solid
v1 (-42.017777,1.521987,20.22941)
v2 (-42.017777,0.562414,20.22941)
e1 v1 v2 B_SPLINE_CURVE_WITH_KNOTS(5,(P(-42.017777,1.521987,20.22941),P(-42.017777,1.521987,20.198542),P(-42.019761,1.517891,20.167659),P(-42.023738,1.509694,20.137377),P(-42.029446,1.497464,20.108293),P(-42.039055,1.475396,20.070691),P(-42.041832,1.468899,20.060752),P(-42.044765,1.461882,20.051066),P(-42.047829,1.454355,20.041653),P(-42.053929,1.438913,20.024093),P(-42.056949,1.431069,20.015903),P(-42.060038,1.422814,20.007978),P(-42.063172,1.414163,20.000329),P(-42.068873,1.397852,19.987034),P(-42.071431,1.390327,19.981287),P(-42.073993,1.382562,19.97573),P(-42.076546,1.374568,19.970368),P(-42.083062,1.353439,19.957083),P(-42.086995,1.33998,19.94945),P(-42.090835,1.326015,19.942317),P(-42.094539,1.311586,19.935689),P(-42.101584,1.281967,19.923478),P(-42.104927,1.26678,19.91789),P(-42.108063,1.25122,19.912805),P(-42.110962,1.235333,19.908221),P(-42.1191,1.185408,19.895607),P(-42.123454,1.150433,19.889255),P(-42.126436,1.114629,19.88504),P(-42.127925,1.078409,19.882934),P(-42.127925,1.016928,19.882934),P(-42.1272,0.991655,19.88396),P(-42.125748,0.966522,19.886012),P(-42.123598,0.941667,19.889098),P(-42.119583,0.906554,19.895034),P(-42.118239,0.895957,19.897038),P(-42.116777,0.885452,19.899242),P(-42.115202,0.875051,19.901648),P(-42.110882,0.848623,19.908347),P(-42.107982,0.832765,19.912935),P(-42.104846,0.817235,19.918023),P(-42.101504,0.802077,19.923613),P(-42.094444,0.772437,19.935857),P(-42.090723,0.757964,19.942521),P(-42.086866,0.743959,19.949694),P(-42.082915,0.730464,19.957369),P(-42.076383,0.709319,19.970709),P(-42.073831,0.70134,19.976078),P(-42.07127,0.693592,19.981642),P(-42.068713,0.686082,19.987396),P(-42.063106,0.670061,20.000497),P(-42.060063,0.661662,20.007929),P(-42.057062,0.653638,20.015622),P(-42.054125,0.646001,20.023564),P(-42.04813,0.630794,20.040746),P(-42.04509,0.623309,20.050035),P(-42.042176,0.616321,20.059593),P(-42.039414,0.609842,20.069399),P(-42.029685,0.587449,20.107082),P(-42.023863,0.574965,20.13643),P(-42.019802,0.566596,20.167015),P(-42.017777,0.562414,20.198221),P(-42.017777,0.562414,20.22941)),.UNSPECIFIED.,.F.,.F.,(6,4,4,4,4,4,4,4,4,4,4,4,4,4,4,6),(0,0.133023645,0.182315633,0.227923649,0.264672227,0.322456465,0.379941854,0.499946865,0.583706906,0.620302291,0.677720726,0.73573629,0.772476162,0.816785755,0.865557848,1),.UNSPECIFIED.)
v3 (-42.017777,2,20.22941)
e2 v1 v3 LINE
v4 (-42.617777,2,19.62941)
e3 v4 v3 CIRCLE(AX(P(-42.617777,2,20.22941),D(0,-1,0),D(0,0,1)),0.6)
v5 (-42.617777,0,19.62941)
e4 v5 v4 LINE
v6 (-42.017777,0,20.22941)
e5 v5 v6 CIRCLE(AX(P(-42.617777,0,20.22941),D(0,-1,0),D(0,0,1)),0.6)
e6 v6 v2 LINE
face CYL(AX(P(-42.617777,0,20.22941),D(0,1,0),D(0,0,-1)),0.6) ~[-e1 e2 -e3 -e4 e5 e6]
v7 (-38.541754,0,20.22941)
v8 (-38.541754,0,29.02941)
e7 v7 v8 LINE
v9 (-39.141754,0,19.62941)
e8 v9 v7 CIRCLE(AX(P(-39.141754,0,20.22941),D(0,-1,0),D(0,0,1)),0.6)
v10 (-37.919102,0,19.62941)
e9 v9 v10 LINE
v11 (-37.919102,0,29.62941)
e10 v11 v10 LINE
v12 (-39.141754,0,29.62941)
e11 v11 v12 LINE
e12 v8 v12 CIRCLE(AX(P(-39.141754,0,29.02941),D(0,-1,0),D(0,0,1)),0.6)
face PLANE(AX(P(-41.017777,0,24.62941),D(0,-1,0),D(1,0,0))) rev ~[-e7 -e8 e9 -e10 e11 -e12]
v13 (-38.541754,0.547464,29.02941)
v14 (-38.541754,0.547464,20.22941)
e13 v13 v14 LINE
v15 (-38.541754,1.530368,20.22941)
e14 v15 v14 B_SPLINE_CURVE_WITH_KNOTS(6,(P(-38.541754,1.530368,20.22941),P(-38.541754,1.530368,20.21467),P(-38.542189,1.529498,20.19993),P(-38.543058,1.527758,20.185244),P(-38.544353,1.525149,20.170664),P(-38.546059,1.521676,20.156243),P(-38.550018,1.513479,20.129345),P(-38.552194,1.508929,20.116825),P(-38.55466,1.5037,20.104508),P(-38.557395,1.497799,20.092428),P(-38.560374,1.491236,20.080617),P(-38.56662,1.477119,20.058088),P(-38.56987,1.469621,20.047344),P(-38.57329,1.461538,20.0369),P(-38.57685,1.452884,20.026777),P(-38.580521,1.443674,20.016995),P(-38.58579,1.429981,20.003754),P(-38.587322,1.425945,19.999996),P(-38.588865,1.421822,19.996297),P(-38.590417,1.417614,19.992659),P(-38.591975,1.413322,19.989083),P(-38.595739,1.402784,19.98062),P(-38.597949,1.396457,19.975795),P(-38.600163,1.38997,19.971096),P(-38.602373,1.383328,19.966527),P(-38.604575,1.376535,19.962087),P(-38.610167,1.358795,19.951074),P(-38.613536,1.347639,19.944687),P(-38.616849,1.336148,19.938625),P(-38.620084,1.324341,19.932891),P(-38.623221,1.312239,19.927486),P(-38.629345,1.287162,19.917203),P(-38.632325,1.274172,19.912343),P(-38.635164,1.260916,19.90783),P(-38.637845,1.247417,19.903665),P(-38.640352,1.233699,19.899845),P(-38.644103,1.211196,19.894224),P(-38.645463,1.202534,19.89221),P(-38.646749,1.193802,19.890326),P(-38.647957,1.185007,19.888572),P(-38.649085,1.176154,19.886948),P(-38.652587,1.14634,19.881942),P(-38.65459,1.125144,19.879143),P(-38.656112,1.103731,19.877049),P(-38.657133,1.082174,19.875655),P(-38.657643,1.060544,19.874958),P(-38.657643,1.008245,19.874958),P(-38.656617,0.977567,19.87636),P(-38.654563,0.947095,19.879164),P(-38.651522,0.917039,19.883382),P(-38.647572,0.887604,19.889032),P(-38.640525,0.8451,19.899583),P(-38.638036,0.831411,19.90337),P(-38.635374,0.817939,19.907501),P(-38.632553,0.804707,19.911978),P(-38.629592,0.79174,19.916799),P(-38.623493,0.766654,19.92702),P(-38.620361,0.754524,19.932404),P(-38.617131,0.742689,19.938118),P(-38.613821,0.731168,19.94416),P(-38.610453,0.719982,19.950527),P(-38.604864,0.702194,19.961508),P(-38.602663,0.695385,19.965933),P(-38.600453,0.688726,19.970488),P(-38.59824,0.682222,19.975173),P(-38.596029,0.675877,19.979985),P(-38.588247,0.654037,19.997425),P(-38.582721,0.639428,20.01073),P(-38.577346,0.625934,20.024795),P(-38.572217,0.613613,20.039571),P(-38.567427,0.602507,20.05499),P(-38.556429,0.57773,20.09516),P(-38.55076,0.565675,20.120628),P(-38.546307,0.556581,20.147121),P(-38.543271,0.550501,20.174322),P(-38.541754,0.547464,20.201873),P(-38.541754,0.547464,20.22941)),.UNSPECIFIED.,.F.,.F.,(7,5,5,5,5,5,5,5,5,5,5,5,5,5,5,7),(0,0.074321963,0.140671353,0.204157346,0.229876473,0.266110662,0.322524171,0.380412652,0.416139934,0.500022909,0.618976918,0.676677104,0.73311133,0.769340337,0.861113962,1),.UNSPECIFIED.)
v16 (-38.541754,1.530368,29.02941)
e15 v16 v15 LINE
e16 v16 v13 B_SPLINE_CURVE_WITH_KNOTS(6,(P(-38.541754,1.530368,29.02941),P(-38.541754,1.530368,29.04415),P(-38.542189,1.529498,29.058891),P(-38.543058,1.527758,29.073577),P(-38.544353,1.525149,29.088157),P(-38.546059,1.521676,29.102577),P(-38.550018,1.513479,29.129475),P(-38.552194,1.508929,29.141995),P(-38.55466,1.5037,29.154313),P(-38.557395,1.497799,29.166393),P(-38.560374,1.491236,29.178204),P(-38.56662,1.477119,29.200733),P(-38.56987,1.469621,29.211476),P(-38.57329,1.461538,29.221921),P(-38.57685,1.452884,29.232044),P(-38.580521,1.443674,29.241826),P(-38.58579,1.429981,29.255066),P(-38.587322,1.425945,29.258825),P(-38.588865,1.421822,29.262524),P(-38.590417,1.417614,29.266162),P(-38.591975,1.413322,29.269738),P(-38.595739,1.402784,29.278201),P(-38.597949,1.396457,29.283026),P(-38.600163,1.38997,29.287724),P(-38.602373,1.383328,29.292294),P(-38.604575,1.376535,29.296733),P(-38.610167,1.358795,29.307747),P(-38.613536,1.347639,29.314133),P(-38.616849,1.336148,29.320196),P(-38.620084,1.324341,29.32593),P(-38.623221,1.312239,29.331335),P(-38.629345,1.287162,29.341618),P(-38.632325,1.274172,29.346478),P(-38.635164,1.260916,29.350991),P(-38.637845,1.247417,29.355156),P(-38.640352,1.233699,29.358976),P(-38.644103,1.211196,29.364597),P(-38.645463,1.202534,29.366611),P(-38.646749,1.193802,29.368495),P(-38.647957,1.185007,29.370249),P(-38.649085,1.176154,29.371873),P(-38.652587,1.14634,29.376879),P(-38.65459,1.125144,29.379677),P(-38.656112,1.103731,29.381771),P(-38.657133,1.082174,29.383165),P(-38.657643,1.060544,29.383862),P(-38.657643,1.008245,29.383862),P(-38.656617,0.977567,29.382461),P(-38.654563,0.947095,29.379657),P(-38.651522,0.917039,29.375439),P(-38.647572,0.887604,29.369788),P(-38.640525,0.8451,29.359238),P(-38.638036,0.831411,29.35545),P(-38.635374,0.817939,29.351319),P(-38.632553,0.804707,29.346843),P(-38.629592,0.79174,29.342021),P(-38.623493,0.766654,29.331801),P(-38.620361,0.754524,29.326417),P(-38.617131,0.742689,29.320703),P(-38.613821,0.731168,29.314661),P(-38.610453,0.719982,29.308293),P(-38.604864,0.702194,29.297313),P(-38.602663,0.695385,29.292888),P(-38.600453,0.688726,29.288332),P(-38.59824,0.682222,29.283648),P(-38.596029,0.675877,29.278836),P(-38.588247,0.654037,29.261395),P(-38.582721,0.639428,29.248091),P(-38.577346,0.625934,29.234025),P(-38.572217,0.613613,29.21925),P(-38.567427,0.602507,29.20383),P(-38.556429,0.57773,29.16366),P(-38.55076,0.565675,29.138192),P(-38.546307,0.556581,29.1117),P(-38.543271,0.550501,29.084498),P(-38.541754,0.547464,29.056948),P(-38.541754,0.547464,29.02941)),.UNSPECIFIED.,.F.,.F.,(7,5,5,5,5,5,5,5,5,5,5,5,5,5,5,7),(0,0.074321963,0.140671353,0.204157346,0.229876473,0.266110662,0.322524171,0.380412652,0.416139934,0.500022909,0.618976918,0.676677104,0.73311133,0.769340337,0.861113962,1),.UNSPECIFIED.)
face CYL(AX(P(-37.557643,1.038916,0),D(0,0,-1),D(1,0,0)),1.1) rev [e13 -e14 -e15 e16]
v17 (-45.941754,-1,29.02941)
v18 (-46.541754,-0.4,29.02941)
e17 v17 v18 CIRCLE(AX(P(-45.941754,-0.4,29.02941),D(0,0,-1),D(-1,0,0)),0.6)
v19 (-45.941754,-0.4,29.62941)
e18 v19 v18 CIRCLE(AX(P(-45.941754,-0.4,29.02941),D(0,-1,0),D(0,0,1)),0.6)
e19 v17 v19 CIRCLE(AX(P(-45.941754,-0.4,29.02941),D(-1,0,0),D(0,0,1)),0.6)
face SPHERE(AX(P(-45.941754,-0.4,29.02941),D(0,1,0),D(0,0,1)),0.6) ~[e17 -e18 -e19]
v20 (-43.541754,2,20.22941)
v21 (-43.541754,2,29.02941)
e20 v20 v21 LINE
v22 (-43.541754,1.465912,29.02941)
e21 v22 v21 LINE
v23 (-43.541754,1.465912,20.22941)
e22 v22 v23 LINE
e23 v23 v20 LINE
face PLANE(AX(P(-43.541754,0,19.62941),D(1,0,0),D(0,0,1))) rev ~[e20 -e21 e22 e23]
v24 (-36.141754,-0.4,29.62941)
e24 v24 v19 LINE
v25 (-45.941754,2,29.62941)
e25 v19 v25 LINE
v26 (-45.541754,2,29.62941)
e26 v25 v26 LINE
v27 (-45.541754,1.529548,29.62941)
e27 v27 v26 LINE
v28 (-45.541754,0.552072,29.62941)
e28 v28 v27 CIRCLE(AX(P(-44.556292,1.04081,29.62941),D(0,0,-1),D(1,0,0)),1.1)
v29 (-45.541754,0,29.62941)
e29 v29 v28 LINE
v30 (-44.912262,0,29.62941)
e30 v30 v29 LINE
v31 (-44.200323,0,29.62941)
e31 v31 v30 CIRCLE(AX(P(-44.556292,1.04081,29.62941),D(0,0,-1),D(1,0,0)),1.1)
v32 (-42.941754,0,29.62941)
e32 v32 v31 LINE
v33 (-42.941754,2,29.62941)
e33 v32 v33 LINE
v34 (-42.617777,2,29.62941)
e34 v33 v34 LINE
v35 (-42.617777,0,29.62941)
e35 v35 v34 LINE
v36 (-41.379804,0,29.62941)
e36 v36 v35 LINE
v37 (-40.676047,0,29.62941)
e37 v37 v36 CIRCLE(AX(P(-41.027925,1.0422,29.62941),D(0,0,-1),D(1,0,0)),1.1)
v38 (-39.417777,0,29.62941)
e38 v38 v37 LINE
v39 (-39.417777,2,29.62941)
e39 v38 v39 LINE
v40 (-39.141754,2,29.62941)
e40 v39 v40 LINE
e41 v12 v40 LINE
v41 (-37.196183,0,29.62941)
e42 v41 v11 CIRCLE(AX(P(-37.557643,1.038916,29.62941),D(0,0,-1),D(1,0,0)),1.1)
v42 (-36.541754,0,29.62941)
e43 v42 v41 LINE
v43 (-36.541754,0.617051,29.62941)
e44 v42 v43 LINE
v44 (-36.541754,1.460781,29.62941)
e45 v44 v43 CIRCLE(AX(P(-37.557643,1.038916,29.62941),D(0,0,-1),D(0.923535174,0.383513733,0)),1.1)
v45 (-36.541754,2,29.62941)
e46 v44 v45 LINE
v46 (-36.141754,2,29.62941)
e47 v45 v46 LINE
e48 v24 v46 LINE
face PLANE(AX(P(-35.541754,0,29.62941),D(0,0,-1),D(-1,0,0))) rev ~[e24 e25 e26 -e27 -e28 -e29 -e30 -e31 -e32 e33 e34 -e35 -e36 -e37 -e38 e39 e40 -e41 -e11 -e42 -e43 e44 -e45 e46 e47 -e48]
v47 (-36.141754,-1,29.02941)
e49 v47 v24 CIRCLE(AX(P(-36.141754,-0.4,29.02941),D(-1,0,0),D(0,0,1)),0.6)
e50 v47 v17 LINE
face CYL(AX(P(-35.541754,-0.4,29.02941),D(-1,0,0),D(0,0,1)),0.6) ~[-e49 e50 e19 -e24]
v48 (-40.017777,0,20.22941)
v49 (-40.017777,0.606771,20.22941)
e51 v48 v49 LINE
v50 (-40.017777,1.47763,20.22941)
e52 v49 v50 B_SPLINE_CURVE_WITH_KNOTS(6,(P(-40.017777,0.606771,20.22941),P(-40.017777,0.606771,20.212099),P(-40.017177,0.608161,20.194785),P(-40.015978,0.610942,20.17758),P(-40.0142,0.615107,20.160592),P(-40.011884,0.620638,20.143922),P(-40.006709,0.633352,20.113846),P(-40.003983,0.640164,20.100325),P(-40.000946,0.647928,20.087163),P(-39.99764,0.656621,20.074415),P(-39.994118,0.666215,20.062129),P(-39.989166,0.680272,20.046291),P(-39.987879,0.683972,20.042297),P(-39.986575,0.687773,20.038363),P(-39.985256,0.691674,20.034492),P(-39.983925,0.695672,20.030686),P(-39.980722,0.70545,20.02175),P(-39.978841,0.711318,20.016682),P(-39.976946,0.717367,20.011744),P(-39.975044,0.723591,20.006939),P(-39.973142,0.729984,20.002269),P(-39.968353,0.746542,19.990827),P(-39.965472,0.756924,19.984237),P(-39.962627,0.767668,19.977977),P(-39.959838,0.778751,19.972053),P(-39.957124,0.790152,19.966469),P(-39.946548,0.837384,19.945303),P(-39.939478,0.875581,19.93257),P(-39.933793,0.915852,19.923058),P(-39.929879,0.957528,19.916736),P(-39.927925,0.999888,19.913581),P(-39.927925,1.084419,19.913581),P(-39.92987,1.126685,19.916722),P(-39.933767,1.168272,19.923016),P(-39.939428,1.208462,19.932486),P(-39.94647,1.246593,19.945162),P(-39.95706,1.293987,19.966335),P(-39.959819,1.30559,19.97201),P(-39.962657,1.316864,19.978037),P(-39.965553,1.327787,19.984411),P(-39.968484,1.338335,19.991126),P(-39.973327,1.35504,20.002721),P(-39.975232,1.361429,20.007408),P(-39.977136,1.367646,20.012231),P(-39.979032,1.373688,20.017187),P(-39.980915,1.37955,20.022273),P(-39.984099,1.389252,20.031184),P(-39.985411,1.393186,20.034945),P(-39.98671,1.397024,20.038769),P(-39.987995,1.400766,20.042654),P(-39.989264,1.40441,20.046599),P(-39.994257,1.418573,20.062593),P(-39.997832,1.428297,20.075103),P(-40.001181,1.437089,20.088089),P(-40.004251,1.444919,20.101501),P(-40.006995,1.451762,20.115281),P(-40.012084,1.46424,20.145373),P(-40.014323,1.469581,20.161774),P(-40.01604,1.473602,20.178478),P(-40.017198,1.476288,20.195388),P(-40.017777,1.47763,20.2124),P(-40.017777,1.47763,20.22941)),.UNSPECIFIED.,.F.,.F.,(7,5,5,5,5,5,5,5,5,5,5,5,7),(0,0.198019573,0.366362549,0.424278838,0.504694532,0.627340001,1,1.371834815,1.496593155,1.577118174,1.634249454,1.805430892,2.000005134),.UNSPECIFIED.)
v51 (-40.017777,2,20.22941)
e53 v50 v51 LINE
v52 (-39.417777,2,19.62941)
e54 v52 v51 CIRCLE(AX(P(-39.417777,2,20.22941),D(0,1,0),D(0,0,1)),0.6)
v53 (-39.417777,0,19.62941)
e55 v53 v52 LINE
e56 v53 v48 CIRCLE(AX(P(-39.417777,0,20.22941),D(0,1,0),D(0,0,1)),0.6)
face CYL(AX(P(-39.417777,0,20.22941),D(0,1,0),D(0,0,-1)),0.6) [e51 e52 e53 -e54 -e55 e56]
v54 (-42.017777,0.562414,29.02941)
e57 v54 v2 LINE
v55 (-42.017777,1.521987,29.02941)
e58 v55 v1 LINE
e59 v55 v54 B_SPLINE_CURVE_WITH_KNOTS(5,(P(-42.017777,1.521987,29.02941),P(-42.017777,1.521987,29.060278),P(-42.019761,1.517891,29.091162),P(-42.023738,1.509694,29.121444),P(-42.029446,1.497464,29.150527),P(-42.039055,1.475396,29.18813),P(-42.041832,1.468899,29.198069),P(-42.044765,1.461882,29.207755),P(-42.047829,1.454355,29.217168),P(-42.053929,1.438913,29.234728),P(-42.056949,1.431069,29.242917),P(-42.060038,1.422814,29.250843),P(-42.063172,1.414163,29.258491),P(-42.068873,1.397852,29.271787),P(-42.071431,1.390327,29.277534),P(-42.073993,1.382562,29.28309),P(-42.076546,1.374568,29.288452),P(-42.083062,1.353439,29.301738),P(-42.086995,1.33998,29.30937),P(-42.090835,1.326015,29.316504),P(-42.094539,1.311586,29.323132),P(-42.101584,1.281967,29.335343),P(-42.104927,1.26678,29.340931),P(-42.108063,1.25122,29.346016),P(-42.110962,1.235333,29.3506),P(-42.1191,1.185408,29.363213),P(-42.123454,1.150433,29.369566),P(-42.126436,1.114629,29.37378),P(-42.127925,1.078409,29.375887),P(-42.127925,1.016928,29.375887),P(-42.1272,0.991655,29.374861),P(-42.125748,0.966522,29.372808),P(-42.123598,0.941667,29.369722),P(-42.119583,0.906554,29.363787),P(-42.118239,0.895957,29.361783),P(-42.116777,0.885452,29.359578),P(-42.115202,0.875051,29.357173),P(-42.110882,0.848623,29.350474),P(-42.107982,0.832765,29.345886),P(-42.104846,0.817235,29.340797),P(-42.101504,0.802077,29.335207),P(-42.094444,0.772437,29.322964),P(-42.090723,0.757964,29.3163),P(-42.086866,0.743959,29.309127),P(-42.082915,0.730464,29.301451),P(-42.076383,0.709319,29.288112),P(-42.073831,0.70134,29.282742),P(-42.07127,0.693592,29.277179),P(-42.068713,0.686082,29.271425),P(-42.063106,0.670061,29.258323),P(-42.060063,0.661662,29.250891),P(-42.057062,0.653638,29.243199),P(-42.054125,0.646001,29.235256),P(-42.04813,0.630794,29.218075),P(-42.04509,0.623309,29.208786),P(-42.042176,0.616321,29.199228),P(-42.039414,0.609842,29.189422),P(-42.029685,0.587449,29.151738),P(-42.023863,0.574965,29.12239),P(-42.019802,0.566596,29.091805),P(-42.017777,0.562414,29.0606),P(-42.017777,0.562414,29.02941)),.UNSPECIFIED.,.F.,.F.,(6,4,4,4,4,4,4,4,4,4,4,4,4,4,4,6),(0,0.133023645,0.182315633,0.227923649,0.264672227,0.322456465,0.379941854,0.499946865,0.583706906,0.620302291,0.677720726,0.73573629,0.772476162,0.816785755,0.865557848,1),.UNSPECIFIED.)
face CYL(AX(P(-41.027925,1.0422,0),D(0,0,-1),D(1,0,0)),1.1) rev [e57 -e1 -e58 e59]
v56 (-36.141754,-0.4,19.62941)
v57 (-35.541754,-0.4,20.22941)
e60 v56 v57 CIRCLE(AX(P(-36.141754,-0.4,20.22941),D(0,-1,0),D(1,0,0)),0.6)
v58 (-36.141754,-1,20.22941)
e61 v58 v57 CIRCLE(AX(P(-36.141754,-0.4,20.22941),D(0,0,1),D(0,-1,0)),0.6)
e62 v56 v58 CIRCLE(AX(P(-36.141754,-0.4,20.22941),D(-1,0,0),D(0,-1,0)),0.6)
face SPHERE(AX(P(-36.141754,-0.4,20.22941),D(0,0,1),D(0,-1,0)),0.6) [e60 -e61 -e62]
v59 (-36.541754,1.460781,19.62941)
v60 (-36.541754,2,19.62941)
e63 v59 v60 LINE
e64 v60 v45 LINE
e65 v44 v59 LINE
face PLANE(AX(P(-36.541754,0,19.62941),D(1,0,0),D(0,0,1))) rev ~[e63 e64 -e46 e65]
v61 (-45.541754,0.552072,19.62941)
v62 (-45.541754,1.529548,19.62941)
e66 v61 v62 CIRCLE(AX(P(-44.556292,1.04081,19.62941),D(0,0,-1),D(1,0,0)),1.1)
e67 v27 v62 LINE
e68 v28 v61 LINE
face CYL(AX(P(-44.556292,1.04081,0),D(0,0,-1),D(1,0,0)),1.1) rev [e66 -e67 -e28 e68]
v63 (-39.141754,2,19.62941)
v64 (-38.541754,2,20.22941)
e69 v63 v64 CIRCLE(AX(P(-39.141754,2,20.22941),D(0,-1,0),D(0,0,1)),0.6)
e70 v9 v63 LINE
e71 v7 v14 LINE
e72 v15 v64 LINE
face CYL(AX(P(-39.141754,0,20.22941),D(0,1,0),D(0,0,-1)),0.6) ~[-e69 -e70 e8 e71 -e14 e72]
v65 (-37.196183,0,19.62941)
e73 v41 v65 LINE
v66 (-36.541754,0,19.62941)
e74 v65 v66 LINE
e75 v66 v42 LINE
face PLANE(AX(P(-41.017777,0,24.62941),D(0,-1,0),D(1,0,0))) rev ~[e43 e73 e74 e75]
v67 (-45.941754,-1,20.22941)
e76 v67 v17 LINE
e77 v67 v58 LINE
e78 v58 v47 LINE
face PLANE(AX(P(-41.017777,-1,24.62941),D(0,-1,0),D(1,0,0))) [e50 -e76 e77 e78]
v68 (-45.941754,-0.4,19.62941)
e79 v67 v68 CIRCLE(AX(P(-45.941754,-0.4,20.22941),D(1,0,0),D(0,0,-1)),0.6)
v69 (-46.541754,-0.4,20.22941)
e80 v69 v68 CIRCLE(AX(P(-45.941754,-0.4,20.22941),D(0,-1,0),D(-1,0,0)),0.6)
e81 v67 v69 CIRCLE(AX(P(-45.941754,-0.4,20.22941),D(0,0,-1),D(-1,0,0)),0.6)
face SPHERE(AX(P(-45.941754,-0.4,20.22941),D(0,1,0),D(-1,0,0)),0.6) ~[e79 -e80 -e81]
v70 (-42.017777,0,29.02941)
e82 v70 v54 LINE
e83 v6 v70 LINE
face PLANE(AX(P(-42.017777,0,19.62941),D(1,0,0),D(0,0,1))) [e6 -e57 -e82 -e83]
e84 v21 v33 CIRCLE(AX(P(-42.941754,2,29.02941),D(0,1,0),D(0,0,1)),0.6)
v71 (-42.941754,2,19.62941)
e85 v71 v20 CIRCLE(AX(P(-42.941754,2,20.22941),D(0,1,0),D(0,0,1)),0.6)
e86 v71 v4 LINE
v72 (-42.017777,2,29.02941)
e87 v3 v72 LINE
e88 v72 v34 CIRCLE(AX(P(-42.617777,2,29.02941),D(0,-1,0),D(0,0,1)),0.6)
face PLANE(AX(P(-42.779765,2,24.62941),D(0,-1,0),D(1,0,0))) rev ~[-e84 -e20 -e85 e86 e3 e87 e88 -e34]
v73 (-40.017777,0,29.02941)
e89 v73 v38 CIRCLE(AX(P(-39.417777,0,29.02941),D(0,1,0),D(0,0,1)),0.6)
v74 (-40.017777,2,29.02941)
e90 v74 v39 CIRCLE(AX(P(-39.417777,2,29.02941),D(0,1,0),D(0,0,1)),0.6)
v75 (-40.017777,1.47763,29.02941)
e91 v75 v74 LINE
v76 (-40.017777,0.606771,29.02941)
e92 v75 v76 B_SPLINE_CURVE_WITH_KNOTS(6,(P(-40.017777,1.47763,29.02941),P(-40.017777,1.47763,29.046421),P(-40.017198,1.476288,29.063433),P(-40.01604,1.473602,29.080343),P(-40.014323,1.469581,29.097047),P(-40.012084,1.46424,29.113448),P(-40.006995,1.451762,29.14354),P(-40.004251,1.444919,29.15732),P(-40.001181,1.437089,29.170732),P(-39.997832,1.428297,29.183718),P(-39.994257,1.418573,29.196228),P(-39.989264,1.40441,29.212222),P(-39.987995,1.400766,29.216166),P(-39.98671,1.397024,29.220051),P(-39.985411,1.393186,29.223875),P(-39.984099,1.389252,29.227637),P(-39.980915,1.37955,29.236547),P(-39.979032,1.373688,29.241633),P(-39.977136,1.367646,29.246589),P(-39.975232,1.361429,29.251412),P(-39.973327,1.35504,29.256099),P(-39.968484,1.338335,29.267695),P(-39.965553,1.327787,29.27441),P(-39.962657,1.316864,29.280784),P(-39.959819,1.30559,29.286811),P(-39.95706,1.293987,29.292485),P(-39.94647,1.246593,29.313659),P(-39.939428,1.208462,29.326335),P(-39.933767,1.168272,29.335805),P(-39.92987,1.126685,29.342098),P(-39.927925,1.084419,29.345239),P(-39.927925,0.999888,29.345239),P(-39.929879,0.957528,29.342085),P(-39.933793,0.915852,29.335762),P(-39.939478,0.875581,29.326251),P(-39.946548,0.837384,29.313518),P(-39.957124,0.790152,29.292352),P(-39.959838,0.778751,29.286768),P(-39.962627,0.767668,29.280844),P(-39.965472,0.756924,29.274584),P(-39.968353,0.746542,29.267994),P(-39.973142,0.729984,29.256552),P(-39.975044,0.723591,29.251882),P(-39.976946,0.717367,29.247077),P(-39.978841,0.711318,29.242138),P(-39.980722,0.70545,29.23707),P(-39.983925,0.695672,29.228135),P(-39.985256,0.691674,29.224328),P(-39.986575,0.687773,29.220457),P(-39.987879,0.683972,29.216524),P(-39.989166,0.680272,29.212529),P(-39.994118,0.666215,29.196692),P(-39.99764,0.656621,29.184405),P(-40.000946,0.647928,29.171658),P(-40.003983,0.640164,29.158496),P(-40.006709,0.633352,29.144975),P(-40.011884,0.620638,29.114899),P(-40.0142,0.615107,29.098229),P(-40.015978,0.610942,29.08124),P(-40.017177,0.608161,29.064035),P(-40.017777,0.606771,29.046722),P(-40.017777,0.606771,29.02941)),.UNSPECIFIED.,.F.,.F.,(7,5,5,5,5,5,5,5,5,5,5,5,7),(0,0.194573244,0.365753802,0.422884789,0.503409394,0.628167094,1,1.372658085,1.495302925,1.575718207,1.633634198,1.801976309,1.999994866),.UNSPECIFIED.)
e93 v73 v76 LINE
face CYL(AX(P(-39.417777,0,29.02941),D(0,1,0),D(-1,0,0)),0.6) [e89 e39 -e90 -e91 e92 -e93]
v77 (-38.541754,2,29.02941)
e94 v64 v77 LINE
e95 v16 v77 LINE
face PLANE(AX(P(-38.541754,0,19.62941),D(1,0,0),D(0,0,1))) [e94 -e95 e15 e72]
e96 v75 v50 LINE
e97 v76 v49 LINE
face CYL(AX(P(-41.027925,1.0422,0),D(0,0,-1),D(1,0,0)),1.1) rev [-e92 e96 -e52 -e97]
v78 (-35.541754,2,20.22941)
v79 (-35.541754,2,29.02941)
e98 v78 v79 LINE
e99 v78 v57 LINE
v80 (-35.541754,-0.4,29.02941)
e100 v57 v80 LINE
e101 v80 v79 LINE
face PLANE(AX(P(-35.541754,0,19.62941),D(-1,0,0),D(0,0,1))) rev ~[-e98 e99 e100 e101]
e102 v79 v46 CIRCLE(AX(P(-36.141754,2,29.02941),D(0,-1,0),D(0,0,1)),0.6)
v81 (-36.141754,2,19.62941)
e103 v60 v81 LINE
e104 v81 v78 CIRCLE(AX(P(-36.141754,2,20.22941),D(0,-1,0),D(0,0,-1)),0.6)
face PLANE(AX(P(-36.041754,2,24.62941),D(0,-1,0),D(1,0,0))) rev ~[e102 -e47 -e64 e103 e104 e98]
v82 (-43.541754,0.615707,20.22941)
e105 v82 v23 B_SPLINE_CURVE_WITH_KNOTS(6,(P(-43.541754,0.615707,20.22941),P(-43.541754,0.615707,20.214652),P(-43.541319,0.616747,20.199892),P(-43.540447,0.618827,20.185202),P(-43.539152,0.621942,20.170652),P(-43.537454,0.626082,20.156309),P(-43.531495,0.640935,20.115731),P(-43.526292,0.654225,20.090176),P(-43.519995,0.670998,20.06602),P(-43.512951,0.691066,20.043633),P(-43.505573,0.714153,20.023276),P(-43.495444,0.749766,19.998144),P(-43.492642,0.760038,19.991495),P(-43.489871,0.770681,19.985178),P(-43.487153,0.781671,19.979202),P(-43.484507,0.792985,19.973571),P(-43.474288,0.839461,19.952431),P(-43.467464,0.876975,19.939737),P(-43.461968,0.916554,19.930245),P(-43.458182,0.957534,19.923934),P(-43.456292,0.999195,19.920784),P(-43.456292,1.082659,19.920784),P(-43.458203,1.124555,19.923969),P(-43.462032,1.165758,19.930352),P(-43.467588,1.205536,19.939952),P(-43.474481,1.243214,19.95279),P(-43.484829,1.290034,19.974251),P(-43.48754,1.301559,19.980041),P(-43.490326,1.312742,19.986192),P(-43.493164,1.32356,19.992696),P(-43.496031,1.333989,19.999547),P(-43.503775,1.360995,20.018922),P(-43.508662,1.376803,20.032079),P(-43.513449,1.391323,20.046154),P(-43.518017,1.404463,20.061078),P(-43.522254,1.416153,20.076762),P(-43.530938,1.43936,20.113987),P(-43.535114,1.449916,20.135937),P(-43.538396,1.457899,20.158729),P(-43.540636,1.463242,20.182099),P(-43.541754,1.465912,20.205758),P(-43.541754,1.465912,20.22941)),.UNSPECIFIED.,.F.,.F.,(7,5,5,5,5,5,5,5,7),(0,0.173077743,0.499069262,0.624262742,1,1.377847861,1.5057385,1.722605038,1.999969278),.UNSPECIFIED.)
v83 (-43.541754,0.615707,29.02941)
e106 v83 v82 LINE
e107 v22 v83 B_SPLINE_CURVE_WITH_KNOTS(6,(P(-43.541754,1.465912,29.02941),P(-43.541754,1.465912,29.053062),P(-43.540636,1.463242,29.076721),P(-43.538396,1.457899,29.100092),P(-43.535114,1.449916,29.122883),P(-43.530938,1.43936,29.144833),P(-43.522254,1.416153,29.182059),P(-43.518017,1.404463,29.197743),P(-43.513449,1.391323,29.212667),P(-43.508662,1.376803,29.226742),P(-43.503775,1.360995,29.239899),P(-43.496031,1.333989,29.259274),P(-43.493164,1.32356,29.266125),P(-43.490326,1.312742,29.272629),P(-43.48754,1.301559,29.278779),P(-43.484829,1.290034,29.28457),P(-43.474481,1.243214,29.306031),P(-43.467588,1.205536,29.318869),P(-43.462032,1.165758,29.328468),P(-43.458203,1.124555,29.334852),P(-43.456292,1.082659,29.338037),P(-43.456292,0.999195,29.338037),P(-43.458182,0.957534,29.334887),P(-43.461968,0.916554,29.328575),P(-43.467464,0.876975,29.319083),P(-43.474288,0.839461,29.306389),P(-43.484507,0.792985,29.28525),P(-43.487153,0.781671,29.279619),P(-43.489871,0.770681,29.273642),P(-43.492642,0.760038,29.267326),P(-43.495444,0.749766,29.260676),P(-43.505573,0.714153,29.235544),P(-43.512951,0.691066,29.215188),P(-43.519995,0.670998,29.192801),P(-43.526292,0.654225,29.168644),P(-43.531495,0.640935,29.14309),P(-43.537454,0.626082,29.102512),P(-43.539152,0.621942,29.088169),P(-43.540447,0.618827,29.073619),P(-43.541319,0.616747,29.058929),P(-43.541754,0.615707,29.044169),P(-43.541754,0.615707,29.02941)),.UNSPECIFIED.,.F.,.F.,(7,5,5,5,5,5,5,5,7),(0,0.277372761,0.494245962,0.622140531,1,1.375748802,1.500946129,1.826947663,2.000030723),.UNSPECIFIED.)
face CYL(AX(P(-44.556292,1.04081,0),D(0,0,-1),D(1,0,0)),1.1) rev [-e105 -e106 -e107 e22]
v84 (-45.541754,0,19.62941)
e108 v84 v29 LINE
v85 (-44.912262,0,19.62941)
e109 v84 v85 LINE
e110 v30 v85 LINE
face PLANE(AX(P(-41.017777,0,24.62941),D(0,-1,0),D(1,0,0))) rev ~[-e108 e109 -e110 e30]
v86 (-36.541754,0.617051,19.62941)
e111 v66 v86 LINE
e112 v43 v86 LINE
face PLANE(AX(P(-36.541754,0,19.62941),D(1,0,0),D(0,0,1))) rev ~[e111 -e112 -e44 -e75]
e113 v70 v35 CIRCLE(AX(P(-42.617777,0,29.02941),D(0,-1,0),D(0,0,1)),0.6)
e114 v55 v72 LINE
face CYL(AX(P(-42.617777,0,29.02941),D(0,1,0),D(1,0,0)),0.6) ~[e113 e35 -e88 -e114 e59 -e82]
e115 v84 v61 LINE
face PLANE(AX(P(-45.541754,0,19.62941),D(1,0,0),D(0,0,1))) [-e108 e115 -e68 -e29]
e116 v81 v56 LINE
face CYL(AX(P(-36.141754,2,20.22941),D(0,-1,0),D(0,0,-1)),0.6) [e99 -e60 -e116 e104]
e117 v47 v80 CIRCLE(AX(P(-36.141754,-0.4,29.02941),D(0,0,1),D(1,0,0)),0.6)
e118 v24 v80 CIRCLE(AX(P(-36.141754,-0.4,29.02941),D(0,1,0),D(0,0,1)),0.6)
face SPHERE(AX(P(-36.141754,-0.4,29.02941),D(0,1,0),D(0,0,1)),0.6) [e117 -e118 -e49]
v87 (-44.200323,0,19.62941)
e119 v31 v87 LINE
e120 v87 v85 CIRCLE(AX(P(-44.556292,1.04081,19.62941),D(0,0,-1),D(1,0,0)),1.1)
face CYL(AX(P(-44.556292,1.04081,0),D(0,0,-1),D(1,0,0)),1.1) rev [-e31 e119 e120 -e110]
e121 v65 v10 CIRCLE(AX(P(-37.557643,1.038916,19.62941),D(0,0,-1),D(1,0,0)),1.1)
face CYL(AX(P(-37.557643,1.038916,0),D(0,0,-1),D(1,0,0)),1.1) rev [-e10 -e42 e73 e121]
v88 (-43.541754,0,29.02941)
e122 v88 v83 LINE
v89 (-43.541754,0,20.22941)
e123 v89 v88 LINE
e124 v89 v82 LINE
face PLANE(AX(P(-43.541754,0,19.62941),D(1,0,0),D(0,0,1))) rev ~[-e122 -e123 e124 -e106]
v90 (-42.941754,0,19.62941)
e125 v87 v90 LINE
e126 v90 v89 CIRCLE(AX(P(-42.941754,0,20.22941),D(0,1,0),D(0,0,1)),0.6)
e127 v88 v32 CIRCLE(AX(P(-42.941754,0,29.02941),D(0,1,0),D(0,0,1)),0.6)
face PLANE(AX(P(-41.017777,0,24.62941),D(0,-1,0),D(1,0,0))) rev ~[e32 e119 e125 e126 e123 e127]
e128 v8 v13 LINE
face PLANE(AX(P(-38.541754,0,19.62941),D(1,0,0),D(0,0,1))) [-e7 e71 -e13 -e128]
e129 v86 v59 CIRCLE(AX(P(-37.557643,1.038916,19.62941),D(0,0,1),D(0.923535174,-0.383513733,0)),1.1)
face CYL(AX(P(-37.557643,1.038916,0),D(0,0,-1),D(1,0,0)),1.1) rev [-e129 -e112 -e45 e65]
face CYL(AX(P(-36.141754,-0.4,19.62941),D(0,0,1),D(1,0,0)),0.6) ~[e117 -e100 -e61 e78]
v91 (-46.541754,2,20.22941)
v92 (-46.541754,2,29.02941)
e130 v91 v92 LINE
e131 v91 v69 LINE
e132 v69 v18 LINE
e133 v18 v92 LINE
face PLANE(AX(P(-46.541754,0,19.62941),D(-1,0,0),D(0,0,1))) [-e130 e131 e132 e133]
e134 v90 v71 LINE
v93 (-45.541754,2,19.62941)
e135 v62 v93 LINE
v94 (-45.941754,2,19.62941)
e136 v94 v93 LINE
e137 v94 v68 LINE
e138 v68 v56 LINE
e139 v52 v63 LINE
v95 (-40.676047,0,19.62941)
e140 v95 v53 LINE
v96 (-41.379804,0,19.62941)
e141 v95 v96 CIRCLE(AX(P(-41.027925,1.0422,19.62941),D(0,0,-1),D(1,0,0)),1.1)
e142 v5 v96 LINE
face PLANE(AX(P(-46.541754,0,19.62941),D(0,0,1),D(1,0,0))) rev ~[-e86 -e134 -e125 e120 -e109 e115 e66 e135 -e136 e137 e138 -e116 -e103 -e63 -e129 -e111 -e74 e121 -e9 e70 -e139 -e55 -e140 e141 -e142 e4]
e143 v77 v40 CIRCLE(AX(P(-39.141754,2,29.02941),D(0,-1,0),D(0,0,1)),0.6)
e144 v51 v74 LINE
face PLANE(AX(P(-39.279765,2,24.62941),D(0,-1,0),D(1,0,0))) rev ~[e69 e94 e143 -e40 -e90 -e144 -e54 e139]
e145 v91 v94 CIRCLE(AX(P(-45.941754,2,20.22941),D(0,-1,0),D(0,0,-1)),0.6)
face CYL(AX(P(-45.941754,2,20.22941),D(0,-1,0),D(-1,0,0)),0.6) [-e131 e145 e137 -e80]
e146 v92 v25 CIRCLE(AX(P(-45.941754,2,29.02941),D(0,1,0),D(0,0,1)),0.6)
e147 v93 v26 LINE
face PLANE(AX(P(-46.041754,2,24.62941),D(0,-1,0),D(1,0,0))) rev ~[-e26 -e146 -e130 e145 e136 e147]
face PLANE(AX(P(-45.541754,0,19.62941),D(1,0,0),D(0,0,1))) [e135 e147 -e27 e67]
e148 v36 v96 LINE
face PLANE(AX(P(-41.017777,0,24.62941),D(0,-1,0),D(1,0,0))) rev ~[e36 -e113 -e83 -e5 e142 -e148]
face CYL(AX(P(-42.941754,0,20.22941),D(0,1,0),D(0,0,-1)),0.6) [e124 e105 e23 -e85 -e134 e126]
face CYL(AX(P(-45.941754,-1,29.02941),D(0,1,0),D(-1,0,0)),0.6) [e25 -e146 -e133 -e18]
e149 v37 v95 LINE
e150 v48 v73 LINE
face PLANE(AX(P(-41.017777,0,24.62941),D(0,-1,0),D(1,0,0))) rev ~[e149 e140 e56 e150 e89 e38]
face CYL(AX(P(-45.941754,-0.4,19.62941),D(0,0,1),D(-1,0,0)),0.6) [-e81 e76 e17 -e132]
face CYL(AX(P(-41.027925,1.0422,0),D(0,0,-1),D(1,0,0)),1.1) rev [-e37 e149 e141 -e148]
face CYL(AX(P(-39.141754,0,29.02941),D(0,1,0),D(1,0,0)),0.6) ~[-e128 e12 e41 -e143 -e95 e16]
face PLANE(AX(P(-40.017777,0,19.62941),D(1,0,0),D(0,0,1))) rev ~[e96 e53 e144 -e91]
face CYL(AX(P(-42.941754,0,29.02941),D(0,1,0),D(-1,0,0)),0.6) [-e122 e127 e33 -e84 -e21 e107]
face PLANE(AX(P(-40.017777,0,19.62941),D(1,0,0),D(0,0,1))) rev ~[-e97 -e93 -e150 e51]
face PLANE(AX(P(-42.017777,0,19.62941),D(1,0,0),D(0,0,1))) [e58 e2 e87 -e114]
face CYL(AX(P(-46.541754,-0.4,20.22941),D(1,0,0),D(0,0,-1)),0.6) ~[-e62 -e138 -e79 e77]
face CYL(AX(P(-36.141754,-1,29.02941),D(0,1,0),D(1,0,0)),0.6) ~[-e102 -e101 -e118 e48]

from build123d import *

# Parameters (mm, degrees)
F0_W     = 1
F0_H     = 10
F1_DEPTH = 2
F0_W_2   = 1.5239776969
F0_W_3   = 1.4760223031
F0_W_4   = 2
F2_DEPTH = 1
F3_R     = 0.6
F4_R     = 1.1
F5_DEPTH = 50


with BuildPart() as f1:
    # F0 (on Front) → F1 (new body)
    with BuildSketch(Plane.XZ):
        with Locations((-46.041754216, 24.6294103354)):
            Rectangle(F0_W, F0_H)
    extrude(amount=-F1_DEPTH)



with BuildPart() as f1b:
    # F0 (on Front) → F1, piece 2 (new body)
    with BuildSketch(Plane.XZ):
        with Locations((-42.7797653675, 24.6294103354)):
            Rectangle(F0_W_2, F0_H)
    extrude(amount=-F1_DEPTH)


with BuildPart() as f1c:
    # F0 (on Front) → F1, piece 3 (new body)
    with BuildSketch(Plane.XZ):
        with Locations((-39.2797653675, 24.6294103354)):
            Rectangle(F0_W_3, F0_H)
    extrude(amount=-F1_DEPTH)


with BuildPart() as f1d:
    # F0 (on Front) → F1, piece 4 (new body)
    with BuildSketch(Plane.XZ):
        with Locations((-36.041754216, 24.6294103354)):
            Rectangle(F0_W, F0_H)
    extrude(amount=-F1_DEPTH)


with BuildPart() as f1_1:
    add(f1.part)

    add(f1b.part)  # F2 merges F1b

    add(f1c.part)  # F2 merges F1c

    add(f1d.part)  # F2 merges F1d
    # F0 (on Front) → F2 (join)
    with BuildSketch(Plane.XZ):
        with Locations((-41.0177765191, 24.6294103354)):
            Rectangle(F0_W_4, F0_H)
        with Locations((-39.2797653675, 24.6294103354)):
            Rectangle(F0_W_3, F0_H)
        with Locations((-46.041754216, 24.6294103354)):
            Rectangle(F0_W, F0_H)
        with Locations((-44.541754216, 24.6294103354)):
            Rectangle(F0_W_4, F0_H)
        with Locations((-36.041754216, 24.6294103354)):
            Rectangle(F0_W, F0_H)
        with Locations((-42.7797653675, 24.6294103354)):
            Rectangle(F0_W_2, F0_H)
        with Locations((-37.541754216, 24.6294103354)):
            Rectangle(F0_W_4, F0_H)
    extrude(amount=F2_DEPTH)

    # F3
    f3_edges = [f1_1.edges().sort_by_distance(p)[0] for p in [
        (-43.541754, 1, 29.62941),
        (-42.017777, 1, 29.62941),
        (-40.017777, 1, 19.62941),
        (-38.541754, 1, 19.62941),
        (-40.017777, 1, 29.62941),
        (-38.541754, 1, 29.62941),
        (-43.541754, 1, 19.62941),
        (-42.017777, 1, 19.62941),
        (-46.541754, 0.5, 19.62941),
        (-46.541754, 0.5, 29.62941),
        (-35.541754, 0.5, 29.62941),
        (-41.041754, -1, 29.62941),
        (-35.541754, -1, 24.62941),
        (-46.541754, -1, 24.62941),
        (-41.041754, -1, 19.62941),
        (-35.541754, 0.5, 19.62941),
    ]]
    fillet(f3_edges, radius=F3_R)

    # F4 (on Top) → F5 (cut)
    with BuildSketch(Plane.XY):
        with Locations((-37.5576429069, 1.0389162926)):
            Circle(F4_R)
        with Locations((-41.0279254586, 1.0422003123)):
            Circle(F4_R)
        with Locations((-44.5562924673, 1.0408099828)):
            Circle(F4_R)
    extrude(amount=F5_DEPTH, mode=Mode.SUBTRACT)


solid = f1_1.part
